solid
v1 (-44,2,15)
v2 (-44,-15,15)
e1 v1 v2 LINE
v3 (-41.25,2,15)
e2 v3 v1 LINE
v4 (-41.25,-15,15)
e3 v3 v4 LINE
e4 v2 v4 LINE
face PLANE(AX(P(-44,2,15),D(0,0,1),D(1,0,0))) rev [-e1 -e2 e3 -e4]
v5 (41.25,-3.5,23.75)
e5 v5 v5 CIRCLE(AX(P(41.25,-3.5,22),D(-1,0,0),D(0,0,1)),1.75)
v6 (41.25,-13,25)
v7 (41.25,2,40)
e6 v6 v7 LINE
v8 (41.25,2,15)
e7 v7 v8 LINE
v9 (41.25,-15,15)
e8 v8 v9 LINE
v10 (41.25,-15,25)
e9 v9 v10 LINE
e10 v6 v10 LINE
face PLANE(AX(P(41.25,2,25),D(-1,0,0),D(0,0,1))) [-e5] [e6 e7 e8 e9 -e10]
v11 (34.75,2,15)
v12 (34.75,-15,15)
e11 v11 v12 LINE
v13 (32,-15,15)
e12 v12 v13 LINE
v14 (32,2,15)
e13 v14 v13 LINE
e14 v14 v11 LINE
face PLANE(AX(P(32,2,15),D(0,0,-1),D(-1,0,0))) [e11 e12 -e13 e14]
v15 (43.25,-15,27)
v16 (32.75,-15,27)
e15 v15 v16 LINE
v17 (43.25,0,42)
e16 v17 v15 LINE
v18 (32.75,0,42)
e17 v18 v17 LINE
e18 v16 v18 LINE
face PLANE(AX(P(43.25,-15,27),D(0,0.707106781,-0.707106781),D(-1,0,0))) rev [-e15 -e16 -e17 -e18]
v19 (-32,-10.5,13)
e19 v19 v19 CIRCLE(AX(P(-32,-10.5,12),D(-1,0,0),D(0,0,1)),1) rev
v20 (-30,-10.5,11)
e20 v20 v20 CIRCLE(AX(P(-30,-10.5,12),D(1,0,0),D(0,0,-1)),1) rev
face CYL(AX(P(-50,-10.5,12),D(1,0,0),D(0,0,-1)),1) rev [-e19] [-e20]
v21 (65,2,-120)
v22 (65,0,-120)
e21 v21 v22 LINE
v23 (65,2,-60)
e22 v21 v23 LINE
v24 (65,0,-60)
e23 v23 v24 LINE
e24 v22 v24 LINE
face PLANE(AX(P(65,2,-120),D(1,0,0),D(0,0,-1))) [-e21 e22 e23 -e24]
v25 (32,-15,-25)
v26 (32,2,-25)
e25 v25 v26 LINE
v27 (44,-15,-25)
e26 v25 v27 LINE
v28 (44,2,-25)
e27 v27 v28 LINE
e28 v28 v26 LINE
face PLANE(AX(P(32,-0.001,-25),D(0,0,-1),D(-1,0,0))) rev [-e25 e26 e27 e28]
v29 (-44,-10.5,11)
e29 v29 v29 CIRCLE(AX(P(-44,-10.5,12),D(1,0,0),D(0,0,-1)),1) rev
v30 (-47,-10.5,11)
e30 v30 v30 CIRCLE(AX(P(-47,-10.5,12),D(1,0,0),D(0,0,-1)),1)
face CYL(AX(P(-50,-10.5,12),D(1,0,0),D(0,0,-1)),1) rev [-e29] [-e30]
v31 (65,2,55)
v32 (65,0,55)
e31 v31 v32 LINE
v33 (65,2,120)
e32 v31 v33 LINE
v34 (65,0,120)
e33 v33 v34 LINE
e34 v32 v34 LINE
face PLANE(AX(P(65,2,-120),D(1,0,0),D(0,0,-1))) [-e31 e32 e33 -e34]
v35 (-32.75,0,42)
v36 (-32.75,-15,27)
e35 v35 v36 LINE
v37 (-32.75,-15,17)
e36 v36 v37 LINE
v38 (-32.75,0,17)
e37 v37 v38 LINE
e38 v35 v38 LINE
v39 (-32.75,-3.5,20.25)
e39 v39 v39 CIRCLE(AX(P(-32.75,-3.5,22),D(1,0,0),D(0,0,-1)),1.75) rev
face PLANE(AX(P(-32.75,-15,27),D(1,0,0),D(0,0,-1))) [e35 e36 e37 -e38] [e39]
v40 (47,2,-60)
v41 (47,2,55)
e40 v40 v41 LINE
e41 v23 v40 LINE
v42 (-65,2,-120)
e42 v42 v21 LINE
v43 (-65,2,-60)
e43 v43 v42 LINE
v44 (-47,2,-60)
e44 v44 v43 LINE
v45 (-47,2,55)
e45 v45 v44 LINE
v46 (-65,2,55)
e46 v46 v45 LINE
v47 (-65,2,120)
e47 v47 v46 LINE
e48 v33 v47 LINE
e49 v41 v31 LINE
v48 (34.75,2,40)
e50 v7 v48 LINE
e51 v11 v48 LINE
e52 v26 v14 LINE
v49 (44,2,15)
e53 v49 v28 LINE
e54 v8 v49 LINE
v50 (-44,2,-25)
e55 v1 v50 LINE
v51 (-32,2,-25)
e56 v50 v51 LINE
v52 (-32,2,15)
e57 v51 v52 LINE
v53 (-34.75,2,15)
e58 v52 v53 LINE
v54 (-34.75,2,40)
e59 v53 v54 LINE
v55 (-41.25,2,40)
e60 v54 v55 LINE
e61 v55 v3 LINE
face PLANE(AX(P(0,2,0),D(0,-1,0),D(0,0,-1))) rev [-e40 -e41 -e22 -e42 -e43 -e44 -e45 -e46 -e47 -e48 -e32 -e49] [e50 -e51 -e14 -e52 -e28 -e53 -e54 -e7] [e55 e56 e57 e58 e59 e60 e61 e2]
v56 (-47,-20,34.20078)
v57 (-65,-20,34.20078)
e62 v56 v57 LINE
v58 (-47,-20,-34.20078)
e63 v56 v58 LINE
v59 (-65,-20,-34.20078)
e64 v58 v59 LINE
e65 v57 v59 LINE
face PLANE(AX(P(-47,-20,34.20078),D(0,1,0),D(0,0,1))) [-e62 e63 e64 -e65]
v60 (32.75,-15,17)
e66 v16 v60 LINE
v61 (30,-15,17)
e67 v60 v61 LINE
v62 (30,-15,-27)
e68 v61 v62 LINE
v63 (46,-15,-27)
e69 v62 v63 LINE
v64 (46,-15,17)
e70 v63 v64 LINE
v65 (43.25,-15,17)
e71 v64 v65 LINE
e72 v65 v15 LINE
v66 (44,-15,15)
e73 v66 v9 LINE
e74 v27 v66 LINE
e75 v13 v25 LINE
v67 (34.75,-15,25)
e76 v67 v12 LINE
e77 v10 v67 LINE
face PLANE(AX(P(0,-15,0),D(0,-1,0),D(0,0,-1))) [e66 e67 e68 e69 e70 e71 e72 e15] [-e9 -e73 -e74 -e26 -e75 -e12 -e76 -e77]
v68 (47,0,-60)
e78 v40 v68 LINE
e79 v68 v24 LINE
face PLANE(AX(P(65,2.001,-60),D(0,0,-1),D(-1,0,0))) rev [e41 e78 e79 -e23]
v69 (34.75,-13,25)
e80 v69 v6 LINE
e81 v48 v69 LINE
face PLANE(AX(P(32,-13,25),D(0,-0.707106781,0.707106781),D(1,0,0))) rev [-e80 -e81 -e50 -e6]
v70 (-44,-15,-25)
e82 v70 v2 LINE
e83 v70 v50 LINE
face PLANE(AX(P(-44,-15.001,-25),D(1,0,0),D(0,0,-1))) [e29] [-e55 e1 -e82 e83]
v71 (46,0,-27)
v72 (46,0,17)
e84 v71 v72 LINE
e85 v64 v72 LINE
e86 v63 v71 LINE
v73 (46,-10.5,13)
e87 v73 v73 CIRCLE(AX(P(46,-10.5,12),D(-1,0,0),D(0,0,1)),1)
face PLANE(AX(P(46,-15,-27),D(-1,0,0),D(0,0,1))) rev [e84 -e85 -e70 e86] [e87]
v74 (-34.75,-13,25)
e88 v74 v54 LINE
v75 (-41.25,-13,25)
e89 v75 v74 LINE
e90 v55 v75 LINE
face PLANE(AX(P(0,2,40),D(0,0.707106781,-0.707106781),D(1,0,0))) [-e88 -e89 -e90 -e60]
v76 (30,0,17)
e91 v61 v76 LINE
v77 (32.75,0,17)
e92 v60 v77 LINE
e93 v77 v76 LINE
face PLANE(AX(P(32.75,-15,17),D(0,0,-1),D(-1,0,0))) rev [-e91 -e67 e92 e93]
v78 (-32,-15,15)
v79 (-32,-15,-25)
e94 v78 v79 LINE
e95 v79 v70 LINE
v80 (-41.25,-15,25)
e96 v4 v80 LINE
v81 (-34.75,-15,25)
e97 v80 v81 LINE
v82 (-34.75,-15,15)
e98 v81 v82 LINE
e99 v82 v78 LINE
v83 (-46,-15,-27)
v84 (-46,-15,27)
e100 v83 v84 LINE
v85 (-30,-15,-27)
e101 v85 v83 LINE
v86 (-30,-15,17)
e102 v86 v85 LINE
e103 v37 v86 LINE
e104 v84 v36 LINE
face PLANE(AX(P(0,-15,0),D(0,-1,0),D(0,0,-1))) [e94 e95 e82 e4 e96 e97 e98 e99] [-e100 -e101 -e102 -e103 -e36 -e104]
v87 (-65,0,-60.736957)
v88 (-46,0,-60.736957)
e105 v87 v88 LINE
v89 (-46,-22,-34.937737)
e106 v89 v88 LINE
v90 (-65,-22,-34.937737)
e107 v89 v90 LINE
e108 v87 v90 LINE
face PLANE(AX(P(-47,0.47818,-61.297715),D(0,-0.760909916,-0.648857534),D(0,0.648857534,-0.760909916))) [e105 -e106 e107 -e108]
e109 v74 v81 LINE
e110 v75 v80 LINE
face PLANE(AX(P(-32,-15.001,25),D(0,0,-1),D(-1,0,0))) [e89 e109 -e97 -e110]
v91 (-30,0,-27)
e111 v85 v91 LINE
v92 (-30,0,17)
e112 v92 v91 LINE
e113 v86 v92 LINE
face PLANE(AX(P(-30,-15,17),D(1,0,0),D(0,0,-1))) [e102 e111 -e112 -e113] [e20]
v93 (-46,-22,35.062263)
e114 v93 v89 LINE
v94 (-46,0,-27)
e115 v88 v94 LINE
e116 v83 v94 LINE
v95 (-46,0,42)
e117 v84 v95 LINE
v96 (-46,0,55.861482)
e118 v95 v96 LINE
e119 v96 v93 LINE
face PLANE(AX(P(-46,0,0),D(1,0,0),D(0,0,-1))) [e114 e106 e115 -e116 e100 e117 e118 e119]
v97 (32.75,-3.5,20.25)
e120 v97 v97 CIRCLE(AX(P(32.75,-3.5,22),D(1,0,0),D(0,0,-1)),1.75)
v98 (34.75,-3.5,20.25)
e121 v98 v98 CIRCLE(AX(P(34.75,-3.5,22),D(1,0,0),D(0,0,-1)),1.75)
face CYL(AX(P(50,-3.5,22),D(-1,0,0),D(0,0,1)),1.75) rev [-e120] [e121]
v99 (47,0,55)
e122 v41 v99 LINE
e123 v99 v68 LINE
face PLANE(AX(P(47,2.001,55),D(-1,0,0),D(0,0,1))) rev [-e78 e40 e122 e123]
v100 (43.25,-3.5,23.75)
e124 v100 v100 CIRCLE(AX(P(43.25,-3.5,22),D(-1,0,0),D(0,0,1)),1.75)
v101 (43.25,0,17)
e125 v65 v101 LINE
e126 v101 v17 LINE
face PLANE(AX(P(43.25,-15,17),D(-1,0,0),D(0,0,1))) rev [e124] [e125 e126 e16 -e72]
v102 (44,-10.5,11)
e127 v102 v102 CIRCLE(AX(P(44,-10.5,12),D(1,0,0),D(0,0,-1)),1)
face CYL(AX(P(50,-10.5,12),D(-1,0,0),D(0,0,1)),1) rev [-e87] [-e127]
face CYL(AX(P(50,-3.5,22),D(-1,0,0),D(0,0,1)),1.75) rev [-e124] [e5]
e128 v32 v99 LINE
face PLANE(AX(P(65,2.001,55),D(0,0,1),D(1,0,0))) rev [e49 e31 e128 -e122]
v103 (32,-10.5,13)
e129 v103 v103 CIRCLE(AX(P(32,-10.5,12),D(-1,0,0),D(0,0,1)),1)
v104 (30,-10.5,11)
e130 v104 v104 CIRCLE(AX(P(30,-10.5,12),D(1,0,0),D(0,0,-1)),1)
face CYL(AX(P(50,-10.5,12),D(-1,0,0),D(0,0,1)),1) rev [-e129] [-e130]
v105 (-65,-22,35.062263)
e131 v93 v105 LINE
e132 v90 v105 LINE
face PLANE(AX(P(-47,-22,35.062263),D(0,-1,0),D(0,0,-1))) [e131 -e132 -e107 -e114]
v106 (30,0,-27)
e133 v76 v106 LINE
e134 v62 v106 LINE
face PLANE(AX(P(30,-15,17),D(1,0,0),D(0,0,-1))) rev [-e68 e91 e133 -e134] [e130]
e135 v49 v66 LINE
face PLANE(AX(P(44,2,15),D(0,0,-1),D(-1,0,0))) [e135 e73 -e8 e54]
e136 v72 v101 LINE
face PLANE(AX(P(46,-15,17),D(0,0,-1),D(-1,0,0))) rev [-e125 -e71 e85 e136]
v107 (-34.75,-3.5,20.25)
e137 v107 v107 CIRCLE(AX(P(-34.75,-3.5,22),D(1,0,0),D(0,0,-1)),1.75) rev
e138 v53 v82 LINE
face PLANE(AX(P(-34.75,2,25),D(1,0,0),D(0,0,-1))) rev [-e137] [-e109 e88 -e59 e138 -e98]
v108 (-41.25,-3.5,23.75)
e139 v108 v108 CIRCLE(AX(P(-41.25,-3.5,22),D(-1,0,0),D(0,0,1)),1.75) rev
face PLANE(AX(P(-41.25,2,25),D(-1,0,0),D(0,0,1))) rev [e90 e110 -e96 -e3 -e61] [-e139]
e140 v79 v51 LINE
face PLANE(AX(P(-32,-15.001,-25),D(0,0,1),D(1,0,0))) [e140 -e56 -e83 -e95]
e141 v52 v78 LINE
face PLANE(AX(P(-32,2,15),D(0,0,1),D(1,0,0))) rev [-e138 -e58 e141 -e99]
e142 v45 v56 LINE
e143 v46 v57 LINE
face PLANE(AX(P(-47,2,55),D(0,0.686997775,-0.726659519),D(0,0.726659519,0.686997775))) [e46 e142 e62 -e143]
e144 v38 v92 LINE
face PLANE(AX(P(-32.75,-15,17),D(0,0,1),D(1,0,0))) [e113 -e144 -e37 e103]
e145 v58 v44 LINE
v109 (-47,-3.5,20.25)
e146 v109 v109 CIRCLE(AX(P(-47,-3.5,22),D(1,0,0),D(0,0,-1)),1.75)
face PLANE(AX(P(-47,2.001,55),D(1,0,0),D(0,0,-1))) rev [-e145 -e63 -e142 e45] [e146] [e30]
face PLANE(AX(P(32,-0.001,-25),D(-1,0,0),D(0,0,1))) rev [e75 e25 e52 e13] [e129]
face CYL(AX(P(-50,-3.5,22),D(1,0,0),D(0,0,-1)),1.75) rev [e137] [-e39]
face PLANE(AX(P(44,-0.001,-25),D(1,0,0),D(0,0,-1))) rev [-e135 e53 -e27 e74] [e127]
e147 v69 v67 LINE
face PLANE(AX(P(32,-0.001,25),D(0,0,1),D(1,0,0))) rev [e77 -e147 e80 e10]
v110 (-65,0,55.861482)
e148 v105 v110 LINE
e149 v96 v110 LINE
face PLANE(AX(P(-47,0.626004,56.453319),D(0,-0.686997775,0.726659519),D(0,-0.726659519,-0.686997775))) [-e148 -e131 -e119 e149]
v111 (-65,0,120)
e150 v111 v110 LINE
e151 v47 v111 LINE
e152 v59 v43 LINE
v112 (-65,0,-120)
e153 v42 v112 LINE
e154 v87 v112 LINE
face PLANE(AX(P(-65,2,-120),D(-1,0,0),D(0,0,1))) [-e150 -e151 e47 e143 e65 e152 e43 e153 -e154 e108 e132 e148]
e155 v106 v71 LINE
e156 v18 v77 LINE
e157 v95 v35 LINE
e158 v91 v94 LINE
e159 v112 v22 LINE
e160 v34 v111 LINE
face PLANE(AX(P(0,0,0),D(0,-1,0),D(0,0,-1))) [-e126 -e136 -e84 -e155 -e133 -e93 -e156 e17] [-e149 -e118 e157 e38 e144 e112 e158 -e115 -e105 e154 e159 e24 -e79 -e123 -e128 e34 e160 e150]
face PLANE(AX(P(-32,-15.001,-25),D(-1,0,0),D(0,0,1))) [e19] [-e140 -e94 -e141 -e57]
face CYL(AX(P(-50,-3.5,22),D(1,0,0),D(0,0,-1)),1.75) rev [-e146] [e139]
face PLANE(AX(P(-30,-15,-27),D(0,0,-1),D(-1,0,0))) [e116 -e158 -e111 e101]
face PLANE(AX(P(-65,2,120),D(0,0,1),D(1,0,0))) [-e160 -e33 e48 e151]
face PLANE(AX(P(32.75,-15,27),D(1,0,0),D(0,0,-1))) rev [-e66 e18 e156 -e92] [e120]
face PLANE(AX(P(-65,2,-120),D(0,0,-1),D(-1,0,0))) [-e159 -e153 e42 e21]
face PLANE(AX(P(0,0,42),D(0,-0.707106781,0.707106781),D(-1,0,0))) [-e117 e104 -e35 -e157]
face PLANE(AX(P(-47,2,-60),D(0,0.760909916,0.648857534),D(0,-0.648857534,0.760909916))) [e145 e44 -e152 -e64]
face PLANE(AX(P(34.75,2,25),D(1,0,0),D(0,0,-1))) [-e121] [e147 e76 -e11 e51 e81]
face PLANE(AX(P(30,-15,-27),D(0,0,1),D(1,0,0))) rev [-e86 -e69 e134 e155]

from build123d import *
from build123d.topology import SkipClean

# Parameters (mm, degrees)
SKETCH1_W                = 100
SKETCH1_H                = 100
BOSS_EXTRUDE1_DEPTH      = 2
CUT_EXTRUDE1_REACH       = 72.739
SKETCH2_W                = 12
SKETCH2_H                = 50
SKETCH3_W                = 2.75
SKETCH3_H                = 10
BOSS_EXTRUDE2_DEPTH      = 2
BOSS_EXTRUDE3_DEPTH      = 15
SKETCH5_R                = 1.75
SKETCH5_R_2              = 1
CUT_EXTRUDE2_DEPTH       = 103.318131336
CHAMFER1_SIZE            = 15
CHAMFER1_OF_MIRROR1_SIZE = 15
SKETCH6_W                = 130
SKETCH6_H                = 240
SKETCH6_W_2              = 100
SKETCH6_H_2              = 100
BOSS_EXTRUDE4_DEPTH      = 2
CUT_EXTRUDE3_REACH       = 139.295
SKETCH7_W                = 18
SKETCH7_H                = 115
BOSS_EXTRUDE5_DEPTH      = 18
SKETCH9_R                = 1.75
SKETCH9_R_2              = 1
BOSS_EXTRUDE10_DEPTH     = 1
BOSS_EXTRUDE11_START     = 2.75
SKETCH10_R               = 1.75
BOSS_EXTRUDE11_DEPTH     = 2.75


with BuildPart() as part:
    # Sketch1 → Boss-Extrude1 (new body)
    with BuildSketch(Plane(origin=(0, 0, 0), x_dir=(1, 0, 0), z_dir=(0, 1, 0))):
        Rectangle(SKETCH1_W, SKETCH1_H)
    extrude(amount=BOSS_EXTRUDE1_DEPTH)

    # Sketch2 → Cut-Extrude1 (cut, up to next)
    with BuildSketch(Plane(origin=(0, 2, 0), x_dir=(1, 0, 0), z_dir=(0, 1, 0)), mode=Mode.PRIVATE) as cut_extrude1_sk1:
        with Locations((38, 0)):
            Rectangle(SKETCH2_W, SKETCH2_H)
    cut_extrude1_tool1 = extrude(cut_extrude1_sk1.sketch, amount=-CUT_EXTRUDE1_REACH, mode=Mode.PRIVATE) & part.part
    cut_extrude1 = cut_extrude1_tool1.solids().sort_by_distance((38, 2, 0))[0]
    add(cut_extrude1, mode=Mode.SUBTRACT)

    # Sketch3 → Boss-Extrude2 (add)
    with BuildSketch(Plane.XZ):
        with Locations((33.375, 20)):
            Rectangle(SKETCH3_W, SKETCH3_H)
        with Locations((42.625, 20)):
            Rectangle(SKETCH3_W, SKETCH3_H)
    boss_extrude2 = extrude(amount=-BOSS_EXTRUDE2_DEPTH)

    # Sketch4 → Boss-Extrude3 (add)
    with BuildSketch(Plane.XZ):
        Polygon((46, 17), (43.25, 17), (43.25, 27), (32.75, 27), (32.75, 17), (30, 17), (30, -27), (46, -27), align=None)
        Polygon((44, 15), (41.25, 15), (41.25, 25), (34.75, 25), (34.75, 15), (32, 15), (32, -25), (44, -25), align=None, mode=Mode.SUBTRACT)
    boss_extrude3 = extrude(amount=BOSS_EXTRUDE3_DEPTH)

    # Sketch5 → Cut-Extrude2 (cut, symmetric)
    with BuildSketch(Plane.ZY.offset(-38)):
        with Locations(Location((22, -3.5, 0), (0, 0, 180))):
            Circle(SKETCH5_R)
        with Locations((12, -10.5)):
            Circle(SKETCH5_R_2)
    cut_extrude2 = extrude(amount=CUT_EXTRUDE2_DEPTH, both=True, mode=Mode.SUBTRACT)

    # Chamfer1
    chamfer1_edges = [part.edges().sort_by_distance(p)[0] for p in [
        (38, 2, 25),
        (38, 0, 27),
    ]]
    chamfer(chamfer1_edges, length=CHAMFER1_SIZE - 0.0001)  # a hair under: the kernel refuses the full size

    # Mirror1: Cut-Extrude1, Boss-Extrude2, Boss-Extrude3, Cut-Extrude2 across plane
    add(cut_extrude1.mirror(Plane(origin=(0, 0, 0), x_dir=(0, 0, 1), z_dir=(1, 0, 0))), mode=Mode.SUBTRACT)
    add(boss_extrude2.mirror(Plane(origin=(0, 0, 0), x_dir=(0, 0, 1), z_dir=(1, 0, 0))))
    add(boss_extrude3.mirror(Plane(origin=(0, 0, 0), x_dir=(0, 0, 1), z_dir=(1, 0, 0))))
    add(cut_extrude2.mirror(Plane(origin=(0, 0, 0), x_dir=(0, 0, 1), z_dir=(1, 0, 0))), mode=Mode.SUBTRACT)

    # Chamfer1 of Mirror1
    chamfer1_of_mirror1_edges = [part.edges().sort_by_distance(p)[0] for p in [
        (-38, 2, 25),
        (-38, 0, 27),
    ]]
    chamfer(chamfer1_of_mirror1_edges, length=CHAMFER1_OF_MIRROR1_SIZE - 0.0001)  # a hair under: the kernel refuses the full size

    # Sketch6 → Boss-Extrude4 (add)
    with BuildSketch(Plane.XZ):
        Rectangle(SKETCH6_W, SKETCH6_H)
        Rectangle(SKETCH6_W_2, SKETCH6_H_2, mode=Mode.SUBTRACT)
    extrude(amount=-BOSS_EXTRUDE4_DEPTH)

    # Sketch7 → Cut-Extrude3 (cut, up to next)
    with BuildSketch(Plane.XZ, mode=Mode.PRIVATE) as cut_extrude3_sk1:
        with Locations((-56, -2.5)):
            Rectangle(SKETCH7_W, SKETCH7_H)
    cut_extrude3_tool1 = extrude(cut_extrude3_sk1.sketch, amount=-CUT_EXTRUDE3_REACH, mode=Mode.PRIVATE) & part.part
    # Sketch7 → Cut-Extrude3 (cut, up to next)
    with BuildSketch(Plane.XZ, mode=Mode.PRIVATE) as cut_extrude3_sk2:
        with Locations((56, -2.5)):
            Rectangle(SKETCH7_W, SKETCH7_H)
    cut_extrude3_tool2 = extrude(cut_extrude3_sk2.sketch, amount=-CUT_EXTRUDE3_REACH, mode=Mode.PRIVATE) & part.part
    add(cut_extrude3_tool1.solids().sort_by_distance((-56, 0, -2.5))[0], mode=Mode.SUBTRACT)
    add(cut_extrude3_tool2.solids().sort_by_distance((56, 0, -2.5))[0], mode=Mode.SUBTRACT)

    # Sketch8 → Boss-Extrude5 (add)
    with BuildSketch(Plane.ZY.offset(65)):
        Polygon((55, 2), (34.200780206, -20), (-34.200780206, -20), (-60, 2), (-61.297715069, 0.478180168), (-34.937737308, -22), (35.062262692, -22), (56.453319038, 0.62600445), align=None)
    extrude(amount=-BOSS_EXTRUDE5_DEPTH)

    # Sketch9 → Boss-Extrude10 (add)
    with BuildSketch(Plane(origin=(-47, 0, 0), x_dir=(0, 0, -1), z_dir=(1, 0, 0))):
        Polygon((63.08234072, 2), (-57.75232065, 2), (-35.062262692, -22), (34.937737308, -22), align=None)
        with Locations((-22, -3.5)):
            Circle(SKETCH9_R, mode=Mode.SUBTRACT)
        with Locations(Location((-12, -10.5, 0), (0, 0, 180))):
            Circle(SKETCH9_R_2, mode=Mode.SUBTRACT)
    extrude(amount=BOSS_EXTRUDE10_DEPTH)

    # Sketch10 → Boss-Extrude11 (add)
    with SkipClean():  # the faces are left unmerged after this step: merging them gives an invalid solid
        with BuildSketch(Plane.ZY.offset(43.25).offset(BOSS_EXTRUDE11_START)):
            Polygon((42, 0), (17, 0), (17, -15), (27, -15), align=None)
            with Locations(Location((22, -3.5, 0), (0, 0, 180))):
                Circle(SKETCH10_R, mode=Mode.SUBTRACT)
        extrude(amount=-BOSS_EXTRUDE11_DEPTH)


solid = part.part
